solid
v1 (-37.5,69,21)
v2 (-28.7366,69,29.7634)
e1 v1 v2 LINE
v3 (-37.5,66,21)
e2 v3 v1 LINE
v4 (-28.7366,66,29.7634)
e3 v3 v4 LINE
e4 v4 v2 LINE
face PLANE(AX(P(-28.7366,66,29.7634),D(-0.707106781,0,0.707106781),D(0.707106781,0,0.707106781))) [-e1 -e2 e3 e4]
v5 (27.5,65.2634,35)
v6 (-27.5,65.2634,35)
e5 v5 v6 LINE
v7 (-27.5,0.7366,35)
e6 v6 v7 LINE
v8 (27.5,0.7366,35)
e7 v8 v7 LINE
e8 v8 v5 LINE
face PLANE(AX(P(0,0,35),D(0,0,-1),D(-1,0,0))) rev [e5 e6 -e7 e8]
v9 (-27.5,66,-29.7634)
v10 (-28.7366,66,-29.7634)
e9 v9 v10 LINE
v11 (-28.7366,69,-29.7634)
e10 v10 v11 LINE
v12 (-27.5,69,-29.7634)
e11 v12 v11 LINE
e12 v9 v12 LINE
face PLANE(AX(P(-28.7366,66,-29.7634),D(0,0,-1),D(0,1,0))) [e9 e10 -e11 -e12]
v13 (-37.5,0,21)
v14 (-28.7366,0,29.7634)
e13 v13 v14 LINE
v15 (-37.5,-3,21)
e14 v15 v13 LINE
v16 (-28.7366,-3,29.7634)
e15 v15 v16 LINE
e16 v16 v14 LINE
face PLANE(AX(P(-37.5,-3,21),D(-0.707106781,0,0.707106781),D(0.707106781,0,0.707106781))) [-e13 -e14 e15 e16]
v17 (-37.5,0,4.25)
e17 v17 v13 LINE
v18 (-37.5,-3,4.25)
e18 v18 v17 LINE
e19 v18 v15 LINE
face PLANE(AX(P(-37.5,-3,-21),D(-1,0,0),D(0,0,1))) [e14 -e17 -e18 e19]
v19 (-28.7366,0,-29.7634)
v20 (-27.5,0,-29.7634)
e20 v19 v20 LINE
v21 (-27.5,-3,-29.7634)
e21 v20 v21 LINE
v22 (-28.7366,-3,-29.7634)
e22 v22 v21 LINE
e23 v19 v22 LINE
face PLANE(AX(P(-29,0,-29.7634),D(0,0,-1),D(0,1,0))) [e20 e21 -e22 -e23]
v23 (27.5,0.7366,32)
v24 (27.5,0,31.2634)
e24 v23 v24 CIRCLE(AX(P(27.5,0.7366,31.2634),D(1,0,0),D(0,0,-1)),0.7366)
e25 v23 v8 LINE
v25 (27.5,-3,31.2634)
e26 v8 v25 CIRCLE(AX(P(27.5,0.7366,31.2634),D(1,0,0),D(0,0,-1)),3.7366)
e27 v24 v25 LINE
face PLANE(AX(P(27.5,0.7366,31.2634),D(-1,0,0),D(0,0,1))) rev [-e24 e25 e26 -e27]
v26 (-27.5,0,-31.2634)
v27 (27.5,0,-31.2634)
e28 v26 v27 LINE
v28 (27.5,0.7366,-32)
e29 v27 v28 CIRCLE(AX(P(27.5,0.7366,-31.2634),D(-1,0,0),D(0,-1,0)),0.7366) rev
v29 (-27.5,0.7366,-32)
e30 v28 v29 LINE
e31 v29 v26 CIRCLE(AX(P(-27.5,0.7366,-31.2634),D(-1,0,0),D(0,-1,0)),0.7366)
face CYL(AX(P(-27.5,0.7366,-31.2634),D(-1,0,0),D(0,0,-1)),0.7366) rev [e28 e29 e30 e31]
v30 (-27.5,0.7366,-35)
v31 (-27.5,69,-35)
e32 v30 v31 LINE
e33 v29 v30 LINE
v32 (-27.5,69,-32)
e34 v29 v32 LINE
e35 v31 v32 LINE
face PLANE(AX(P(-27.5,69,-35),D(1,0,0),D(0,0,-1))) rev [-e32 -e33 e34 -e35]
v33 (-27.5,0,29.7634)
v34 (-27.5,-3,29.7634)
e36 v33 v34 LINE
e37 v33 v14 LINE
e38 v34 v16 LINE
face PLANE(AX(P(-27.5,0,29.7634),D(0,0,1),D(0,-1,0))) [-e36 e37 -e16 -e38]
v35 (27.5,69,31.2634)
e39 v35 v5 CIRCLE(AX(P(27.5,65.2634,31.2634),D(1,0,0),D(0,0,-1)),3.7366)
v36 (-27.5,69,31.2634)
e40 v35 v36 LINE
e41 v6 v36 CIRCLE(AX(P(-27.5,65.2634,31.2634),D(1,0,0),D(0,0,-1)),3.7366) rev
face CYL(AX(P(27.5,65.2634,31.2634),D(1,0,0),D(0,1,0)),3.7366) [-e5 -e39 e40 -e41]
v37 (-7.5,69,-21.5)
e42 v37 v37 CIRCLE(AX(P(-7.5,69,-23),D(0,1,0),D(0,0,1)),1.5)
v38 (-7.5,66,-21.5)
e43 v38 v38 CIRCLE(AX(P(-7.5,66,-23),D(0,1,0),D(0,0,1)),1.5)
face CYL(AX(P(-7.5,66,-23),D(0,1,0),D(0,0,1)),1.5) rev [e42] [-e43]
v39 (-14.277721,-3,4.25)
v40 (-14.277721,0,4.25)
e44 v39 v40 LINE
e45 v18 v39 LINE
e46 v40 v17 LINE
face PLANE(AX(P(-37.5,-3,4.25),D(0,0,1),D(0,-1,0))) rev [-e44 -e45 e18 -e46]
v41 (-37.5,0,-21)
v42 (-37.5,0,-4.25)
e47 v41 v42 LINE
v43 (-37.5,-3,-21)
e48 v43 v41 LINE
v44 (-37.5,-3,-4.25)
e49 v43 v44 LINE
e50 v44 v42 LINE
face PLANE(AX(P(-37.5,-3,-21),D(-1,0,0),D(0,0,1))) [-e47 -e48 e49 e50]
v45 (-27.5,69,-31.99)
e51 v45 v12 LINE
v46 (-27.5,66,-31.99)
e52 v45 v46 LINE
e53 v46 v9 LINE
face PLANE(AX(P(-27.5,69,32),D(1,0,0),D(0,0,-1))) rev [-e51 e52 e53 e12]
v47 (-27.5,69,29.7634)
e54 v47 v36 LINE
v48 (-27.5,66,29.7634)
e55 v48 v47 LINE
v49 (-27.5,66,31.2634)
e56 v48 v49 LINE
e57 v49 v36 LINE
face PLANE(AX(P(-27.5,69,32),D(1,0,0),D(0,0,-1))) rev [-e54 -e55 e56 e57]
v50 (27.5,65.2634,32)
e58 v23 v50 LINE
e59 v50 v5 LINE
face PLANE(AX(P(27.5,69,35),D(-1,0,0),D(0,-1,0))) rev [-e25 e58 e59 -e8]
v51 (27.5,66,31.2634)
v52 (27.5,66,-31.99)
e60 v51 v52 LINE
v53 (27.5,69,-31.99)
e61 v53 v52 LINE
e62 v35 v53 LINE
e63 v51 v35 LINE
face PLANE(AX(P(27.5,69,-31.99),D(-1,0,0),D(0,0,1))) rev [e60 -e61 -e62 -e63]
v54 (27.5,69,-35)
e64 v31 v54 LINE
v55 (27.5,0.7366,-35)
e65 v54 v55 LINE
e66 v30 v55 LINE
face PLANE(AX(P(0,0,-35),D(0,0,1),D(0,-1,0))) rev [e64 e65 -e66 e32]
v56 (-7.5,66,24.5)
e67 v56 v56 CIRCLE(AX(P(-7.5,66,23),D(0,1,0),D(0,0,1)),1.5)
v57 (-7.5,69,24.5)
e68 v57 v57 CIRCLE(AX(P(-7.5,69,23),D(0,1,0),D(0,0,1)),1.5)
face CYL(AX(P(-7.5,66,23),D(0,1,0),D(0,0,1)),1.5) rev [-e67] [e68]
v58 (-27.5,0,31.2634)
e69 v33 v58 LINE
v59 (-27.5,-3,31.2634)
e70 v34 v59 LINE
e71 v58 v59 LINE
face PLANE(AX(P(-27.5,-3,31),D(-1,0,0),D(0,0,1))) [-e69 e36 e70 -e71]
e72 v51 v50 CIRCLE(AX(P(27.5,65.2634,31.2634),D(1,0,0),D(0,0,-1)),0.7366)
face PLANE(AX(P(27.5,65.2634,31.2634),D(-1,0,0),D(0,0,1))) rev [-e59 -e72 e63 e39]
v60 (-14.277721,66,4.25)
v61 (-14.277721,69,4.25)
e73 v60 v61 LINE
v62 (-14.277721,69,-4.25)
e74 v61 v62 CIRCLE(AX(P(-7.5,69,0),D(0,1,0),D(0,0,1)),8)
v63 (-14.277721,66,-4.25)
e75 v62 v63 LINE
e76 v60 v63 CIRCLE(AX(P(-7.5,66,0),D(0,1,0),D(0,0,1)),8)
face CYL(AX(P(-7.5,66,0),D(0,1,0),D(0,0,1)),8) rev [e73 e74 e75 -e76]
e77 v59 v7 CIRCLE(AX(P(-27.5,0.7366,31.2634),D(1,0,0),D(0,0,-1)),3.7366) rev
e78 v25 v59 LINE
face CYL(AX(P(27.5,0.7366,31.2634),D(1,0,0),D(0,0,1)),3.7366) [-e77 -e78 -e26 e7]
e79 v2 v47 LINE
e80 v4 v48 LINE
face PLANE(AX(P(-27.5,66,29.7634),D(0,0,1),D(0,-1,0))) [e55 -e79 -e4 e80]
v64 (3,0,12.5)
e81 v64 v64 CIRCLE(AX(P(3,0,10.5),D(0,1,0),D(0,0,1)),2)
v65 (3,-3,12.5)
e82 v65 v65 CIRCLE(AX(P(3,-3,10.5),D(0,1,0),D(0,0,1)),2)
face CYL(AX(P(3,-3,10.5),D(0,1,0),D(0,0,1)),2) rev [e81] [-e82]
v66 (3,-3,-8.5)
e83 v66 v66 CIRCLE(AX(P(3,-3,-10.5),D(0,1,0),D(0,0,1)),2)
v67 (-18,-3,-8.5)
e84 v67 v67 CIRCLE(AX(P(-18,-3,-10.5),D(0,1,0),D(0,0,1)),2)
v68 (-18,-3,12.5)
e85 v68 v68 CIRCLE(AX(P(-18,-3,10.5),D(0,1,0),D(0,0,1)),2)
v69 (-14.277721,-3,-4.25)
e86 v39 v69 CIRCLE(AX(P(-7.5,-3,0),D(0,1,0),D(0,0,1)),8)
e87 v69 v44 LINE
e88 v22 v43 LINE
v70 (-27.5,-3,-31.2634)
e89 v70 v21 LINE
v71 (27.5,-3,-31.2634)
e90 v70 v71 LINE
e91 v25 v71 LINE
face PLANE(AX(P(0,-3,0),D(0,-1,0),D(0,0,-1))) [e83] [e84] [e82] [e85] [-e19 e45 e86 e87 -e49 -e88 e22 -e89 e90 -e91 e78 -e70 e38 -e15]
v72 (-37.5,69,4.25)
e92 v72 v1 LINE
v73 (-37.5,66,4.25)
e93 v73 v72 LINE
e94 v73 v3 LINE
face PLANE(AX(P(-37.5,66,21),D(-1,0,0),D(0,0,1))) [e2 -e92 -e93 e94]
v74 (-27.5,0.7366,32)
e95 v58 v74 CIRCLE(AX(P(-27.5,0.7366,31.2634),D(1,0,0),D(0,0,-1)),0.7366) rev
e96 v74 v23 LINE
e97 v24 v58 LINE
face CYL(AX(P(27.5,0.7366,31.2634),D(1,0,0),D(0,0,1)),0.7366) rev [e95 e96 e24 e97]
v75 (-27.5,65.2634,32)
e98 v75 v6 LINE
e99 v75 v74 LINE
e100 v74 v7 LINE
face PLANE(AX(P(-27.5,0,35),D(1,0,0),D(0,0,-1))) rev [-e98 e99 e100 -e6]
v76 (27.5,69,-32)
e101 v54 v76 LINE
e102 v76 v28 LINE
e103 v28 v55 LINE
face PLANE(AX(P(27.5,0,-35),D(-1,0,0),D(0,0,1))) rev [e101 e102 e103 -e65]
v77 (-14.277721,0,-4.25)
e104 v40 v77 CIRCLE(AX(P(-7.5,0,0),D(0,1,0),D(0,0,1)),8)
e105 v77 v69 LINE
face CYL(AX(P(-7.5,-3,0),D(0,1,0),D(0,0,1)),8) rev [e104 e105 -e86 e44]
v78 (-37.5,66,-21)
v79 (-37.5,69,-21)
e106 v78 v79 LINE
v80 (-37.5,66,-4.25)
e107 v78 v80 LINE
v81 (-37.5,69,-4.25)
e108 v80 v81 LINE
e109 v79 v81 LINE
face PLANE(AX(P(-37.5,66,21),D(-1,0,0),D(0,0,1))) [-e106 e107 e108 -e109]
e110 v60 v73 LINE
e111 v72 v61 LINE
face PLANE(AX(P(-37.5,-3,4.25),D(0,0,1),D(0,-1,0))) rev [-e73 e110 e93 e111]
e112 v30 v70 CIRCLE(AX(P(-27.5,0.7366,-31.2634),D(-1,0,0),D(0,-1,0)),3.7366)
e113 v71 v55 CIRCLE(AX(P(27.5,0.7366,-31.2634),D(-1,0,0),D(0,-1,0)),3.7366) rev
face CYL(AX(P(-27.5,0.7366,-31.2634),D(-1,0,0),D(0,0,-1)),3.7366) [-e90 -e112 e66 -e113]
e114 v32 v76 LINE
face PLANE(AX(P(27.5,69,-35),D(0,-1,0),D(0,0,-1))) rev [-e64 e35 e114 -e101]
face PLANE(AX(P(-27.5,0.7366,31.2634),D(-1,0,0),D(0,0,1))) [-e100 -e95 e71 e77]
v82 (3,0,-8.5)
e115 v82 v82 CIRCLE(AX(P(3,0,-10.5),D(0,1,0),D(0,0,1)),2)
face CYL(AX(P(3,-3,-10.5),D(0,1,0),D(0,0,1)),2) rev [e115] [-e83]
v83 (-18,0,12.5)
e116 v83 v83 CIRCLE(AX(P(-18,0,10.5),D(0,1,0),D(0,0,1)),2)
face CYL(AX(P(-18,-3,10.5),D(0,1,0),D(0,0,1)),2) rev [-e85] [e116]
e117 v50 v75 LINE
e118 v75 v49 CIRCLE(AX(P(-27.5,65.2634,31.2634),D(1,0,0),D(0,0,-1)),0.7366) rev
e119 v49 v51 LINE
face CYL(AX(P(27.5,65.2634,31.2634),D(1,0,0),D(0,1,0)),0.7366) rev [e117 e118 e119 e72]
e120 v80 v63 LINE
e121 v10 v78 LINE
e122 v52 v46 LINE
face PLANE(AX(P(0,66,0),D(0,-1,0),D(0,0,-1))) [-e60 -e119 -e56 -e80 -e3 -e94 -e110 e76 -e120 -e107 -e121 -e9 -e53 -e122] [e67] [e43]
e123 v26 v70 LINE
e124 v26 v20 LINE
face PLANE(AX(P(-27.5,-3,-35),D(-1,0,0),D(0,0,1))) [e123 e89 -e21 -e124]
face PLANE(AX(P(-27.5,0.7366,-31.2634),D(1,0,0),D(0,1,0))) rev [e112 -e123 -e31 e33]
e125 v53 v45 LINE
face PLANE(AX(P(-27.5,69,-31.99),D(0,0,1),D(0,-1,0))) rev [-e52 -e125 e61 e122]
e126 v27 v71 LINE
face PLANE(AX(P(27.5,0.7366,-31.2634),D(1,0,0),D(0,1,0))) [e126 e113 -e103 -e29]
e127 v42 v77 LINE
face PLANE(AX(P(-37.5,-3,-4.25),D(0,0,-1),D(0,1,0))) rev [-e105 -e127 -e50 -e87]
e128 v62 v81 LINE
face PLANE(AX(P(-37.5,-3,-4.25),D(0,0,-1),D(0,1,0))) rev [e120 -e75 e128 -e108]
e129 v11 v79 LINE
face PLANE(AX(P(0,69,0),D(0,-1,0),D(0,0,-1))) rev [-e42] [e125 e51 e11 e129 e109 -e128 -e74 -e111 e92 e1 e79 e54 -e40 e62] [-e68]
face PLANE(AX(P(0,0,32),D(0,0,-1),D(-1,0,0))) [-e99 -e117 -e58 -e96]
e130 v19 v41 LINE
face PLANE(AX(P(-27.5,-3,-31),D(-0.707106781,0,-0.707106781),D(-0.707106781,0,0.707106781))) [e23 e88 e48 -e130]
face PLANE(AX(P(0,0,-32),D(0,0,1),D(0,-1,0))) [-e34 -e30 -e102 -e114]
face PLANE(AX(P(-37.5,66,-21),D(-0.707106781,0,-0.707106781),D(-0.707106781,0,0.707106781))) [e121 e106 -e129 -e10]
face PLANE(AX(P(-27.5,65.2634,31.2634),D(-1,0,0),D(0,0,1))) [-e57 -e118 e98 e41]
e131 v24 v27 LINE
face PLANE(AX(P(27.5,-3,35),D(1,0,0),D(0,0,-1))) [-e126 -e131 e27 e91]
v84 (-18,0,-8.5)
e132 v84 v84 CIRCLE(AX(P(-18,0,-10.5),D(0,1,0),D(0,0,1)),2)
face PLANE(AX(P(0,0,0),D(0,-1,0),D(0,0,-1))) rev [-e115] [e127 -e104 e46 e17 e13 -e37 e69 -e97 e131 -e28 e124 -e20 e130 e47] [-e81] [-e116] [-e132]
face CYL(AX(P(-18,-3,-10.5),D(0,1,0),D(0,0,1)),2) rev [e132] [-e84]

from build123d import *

# Parameters (mm, degrees)
BASE_FLANGE1_DEPTH           = 3
SKETCH7_R                    = 8
SKETCH7_R_2                  = 2
CUT_EXTRUDE1_DEPTH           = 3
EDGE_FLANGE1_START           = -27.5
EDGE_FLANGE1_DEPTH           = 55
EDGE_FLANGE1_START_2         = -28.7366
EDGE_FLANGE1_2_DEPTH         = 1.2366
EDGE_FLANGE1_3_DEPTH         = 55
EDGE_FLANGE2_STRIP_W         = 13.4732
EDGE_FLANGE2_STRIP_H         = 3
EDGE_FLANGE2_STRIP_CUT_DEPTH = 55
EDGE_FLANGE2_DEPTH           = 55
BOSS_EXTRUDE1_DEPTH          = 3
SKETCH18_R                   = 8
SKETCH18_R_2                 = 1.5
CUT_EXTRUDE2_DEPTH           = 3
SKETCH19_W                   = 24
SKETCH19_H                   = 8.5
CUT_EXTRUDE3_DEPTH           = 72


# Read off the part's stored shape, not the designer's step: Edge-Flange1
# Sheet-metal steps are written as plain solids
with BuildPart() as part:
    # Sketch1 → Base-Flange1 (new body)
    with BuildSketch(Plane(origin=(0, 0, 0), x_dir=(1, 0, 0), z_dir=(0, 1, 0))):
        Polygon((-37.5, 21), (-37.5, -21), (-27.5, -31), (-27.5, -35), (27.5, -35), (27.5, 35), (-27.5, 35), (-27.5, 31), align=None)
    extrude(amount=-BASE_FLANGE1_DEPTH)

    # Sketch7 → Cut-Extrude1 (cut)
    with BuildSketch(Plane(origin=(0, 0, 0), x_dir=(1, 0, 0), z_dir=(0, 1, 0))):
        with Locations(Location((-7.5, 0, 0), (0, 0, 270))):
            Circle(SKETCH7_R)
        with Locations(Location((-18, 10.5, 0), (0, 0, 270))):
            Circle(SKETCH7_R_2)
        with Locations(Location((3, 10.5, 0), (0, 0, 270))):
            Circle(SKETCH7_R_2)
        with Locations(Location((3, -10.5, 0), (0, 0, 270))):
            Circle(SKETCH7_R_2)
        with Locations(Location((-18, -10.5, 0), (0, 0, 270))):
            Circle(SKETCH7_R_2)
    extrude(amount=-CUT_EXTRUDE1_DEPTH, mode=Mode.SUBTRACT)

    # Edge-Flange1 outline → Edge-Flange1 (cut)
    with BuildSketch(Plane.YZ.offset(EDGE_FLANGE1_START)):
        with BuildLine():
            Line((-3, 35), (-3, 31.2634))
            ThreePointArc((-3, 31.2634), (-2.154295979, 33.630867001), (0, 34.926677222))
            Line((0, 34.926677222), (0, 35))
            Line((0, 35), (-3, 35))
        make_face()
        with BuildLine():
            ThreePointArc((0, -34.926677222), (-2.154295979, -33.630867001), (-3, -31.2634))
            Line((-3, -31.2634), (-3, -35))
            Line((-3, -35), (0, -35))
            Line((0, -35), (0, -34.926677222))
        make_face()
    extrude(amount=EDGE_FLANGE1_DEPTH, mode=Mode.SUBTRACT)

    # Edge-Flange1 2 outline → Edge-Flange1 2 (cut)
    with BuildSketch(Plane.YZ.offset(EDGE_FLANGE1_START_2)):
        with BuildLine():
            Line((-3, 29.7634), (0, 29.7634))
            Line((0, 29.7634), (0, 34.926677222))
            ThreePointArc((0, 34.926677222), (-2.154295979, 33.630867001), (-3, 31.2634))
            Line((-3, 31.2634), (-3, 29.7634))
        make_face()
        with BuildLine():
            Line((0, -34.926677222), (0, -29.7634))
            Line((0, -29.7634), (-3, -29.7634))
            Line((-3, -29.7634), (-3, -31.2634))
            ThreePointArc((-3, -31.2634), (-2.154295979, -33.630867001), (0, -34.926677222))
        make_face()
    extrude(amount=EDGE_FLANGE1_2_DEPTH, mode=Mode.SUBTRACT)

    # Edge-Flange1 3 outline → Edge-Flange1 3 (add)
    with BuildSketch(Plane.YZ.offset(EDGE_FLANGE1_START)):
        with BuildLine():
            Line((0, 34.926677222), (0, 31.2634))
            ThreePointArc((0, 31.2634), (0.215745145, 31.784254855), (0.7366, 32))
            Line((0.7366, 32), (69, 32))
            Line((69, 32), (69, 35))
            Line((69, 35), (0.7366, 35))
            ThreePointArc((0.7366, 35), (0.36647982, 34.981624121), (0, 34.926677222))
        make_face()
        with BuildLine():
            ThreePointArc((0.7366, -32), (0.215745145, -31.784254855), (0, -31.2634))
            Line((0, -31.2634), (0, -34.926677222))
            ThreePointArc((0, -34.926677222), (0.36647982, -34.981624121), (0.7366, -35))
            Line((0.7366, -35), (69, -35))
            Line((69, -35), (69, -32))
            Line((69, -32), (0.7366, -32))
        make_face()
    extrude(amount=EDGE_FLANGE1_3_DEPTH)

    # Edge-Flange2 strip (across the edge) → Edge-Flange2 strip cut (cut)
    with BuildSketch(Plane(origin=(-27.5, 69, 32), x_dir=(0, -1, 0), z_dir=(1, 0, 0))):
        with Locations((-3, -1.5)):
            Rectangle(EDGE_FLANGE2_STRIP_W, EDGE_FLANGE2_STRIP_H)
    extrude(amount=EDGE_FLANGE2_STRIP_CUT_DEPTH, mode=Mode.SUBTRACT)

    # Edge-Flange2 section (across the edge) → Edge-Flange2 (add)
    with BuildSketch(Plane(origin=(-27.5, 69, 32), x_dir=(0, -1, 0), z_dir=(1, 0, 0))):
        with BuildLine():
            Line((0, 0.7366), (0, 63.99))
            Line((0, 63.99), (3, 63.99))
            Line((3, 63.99), (3, 0.7366))
            ThreePointArc((3, 0.7366), (3.215745145, 0.215745145), (3.7366, 0))
            Line((3.7366, 0), (3.7366, -3))
            ThreePointArc((3.7366, -3), (1.094424801, -1.905575199), (0, 0.7366))
        make_face()
    extrude(amount=EDGE_FLANGE2_DEPTH)

    # Sketch17 → Boss-Extrude1 (add)
    with BuildSketch(Plane(origin=(0, 69, 0), x_dir=(1, 0, 0), z_dir=(0, 1, 0))):
        Polygon((-27.5, -29.7634), (-28.7366, -29.7634), (-37.5, -21), (-37.5, 21), (-28.7366, 29.7634), (-27.5, 29.7634), align=None)
    extrude(amount=-BOSS_EXTRUDE1_DEPTH)

    # Sketch18 → Cut-Extrude2 (cut)
    with BuildSketch(Plane(origin=(0, 69, 0), x_dir=(1, 0, 0), z_dir=(0, 1, 0))):
        with Locations(Location((-7.5, 0, 0), (0, 0, 270))):
            Circle(SKETCH18_R)
        with Locations(Location((-7.5, 23, 0), (0, 0, 270))):
            Circle(SKETCH18_R_2)
        with Locations(Location((-7.5, -23, 0), (0, 0, 270))):
            Circle(SKETCH18_R_2)
    extrude(amount=-CUT_EXTRUDE2_DEPTH, mode=Mode.SUBTRACT)

    # Sketch19 → Cut-Extrude3 (cut)
    with BuildSketch(Plane(origin=(0, 69, 0), x_dir=(1, 0, 0), z_dir=(0, 1, 0))):
        with Locations((-25.5, 0)):
            Rectangle(SKETCH19_W, SKETCH19_H)
    extrude(amount=-CUT_EXTRUDE3_DEPTH, mode=Mode.SUBTRACT)


solid = part.part
